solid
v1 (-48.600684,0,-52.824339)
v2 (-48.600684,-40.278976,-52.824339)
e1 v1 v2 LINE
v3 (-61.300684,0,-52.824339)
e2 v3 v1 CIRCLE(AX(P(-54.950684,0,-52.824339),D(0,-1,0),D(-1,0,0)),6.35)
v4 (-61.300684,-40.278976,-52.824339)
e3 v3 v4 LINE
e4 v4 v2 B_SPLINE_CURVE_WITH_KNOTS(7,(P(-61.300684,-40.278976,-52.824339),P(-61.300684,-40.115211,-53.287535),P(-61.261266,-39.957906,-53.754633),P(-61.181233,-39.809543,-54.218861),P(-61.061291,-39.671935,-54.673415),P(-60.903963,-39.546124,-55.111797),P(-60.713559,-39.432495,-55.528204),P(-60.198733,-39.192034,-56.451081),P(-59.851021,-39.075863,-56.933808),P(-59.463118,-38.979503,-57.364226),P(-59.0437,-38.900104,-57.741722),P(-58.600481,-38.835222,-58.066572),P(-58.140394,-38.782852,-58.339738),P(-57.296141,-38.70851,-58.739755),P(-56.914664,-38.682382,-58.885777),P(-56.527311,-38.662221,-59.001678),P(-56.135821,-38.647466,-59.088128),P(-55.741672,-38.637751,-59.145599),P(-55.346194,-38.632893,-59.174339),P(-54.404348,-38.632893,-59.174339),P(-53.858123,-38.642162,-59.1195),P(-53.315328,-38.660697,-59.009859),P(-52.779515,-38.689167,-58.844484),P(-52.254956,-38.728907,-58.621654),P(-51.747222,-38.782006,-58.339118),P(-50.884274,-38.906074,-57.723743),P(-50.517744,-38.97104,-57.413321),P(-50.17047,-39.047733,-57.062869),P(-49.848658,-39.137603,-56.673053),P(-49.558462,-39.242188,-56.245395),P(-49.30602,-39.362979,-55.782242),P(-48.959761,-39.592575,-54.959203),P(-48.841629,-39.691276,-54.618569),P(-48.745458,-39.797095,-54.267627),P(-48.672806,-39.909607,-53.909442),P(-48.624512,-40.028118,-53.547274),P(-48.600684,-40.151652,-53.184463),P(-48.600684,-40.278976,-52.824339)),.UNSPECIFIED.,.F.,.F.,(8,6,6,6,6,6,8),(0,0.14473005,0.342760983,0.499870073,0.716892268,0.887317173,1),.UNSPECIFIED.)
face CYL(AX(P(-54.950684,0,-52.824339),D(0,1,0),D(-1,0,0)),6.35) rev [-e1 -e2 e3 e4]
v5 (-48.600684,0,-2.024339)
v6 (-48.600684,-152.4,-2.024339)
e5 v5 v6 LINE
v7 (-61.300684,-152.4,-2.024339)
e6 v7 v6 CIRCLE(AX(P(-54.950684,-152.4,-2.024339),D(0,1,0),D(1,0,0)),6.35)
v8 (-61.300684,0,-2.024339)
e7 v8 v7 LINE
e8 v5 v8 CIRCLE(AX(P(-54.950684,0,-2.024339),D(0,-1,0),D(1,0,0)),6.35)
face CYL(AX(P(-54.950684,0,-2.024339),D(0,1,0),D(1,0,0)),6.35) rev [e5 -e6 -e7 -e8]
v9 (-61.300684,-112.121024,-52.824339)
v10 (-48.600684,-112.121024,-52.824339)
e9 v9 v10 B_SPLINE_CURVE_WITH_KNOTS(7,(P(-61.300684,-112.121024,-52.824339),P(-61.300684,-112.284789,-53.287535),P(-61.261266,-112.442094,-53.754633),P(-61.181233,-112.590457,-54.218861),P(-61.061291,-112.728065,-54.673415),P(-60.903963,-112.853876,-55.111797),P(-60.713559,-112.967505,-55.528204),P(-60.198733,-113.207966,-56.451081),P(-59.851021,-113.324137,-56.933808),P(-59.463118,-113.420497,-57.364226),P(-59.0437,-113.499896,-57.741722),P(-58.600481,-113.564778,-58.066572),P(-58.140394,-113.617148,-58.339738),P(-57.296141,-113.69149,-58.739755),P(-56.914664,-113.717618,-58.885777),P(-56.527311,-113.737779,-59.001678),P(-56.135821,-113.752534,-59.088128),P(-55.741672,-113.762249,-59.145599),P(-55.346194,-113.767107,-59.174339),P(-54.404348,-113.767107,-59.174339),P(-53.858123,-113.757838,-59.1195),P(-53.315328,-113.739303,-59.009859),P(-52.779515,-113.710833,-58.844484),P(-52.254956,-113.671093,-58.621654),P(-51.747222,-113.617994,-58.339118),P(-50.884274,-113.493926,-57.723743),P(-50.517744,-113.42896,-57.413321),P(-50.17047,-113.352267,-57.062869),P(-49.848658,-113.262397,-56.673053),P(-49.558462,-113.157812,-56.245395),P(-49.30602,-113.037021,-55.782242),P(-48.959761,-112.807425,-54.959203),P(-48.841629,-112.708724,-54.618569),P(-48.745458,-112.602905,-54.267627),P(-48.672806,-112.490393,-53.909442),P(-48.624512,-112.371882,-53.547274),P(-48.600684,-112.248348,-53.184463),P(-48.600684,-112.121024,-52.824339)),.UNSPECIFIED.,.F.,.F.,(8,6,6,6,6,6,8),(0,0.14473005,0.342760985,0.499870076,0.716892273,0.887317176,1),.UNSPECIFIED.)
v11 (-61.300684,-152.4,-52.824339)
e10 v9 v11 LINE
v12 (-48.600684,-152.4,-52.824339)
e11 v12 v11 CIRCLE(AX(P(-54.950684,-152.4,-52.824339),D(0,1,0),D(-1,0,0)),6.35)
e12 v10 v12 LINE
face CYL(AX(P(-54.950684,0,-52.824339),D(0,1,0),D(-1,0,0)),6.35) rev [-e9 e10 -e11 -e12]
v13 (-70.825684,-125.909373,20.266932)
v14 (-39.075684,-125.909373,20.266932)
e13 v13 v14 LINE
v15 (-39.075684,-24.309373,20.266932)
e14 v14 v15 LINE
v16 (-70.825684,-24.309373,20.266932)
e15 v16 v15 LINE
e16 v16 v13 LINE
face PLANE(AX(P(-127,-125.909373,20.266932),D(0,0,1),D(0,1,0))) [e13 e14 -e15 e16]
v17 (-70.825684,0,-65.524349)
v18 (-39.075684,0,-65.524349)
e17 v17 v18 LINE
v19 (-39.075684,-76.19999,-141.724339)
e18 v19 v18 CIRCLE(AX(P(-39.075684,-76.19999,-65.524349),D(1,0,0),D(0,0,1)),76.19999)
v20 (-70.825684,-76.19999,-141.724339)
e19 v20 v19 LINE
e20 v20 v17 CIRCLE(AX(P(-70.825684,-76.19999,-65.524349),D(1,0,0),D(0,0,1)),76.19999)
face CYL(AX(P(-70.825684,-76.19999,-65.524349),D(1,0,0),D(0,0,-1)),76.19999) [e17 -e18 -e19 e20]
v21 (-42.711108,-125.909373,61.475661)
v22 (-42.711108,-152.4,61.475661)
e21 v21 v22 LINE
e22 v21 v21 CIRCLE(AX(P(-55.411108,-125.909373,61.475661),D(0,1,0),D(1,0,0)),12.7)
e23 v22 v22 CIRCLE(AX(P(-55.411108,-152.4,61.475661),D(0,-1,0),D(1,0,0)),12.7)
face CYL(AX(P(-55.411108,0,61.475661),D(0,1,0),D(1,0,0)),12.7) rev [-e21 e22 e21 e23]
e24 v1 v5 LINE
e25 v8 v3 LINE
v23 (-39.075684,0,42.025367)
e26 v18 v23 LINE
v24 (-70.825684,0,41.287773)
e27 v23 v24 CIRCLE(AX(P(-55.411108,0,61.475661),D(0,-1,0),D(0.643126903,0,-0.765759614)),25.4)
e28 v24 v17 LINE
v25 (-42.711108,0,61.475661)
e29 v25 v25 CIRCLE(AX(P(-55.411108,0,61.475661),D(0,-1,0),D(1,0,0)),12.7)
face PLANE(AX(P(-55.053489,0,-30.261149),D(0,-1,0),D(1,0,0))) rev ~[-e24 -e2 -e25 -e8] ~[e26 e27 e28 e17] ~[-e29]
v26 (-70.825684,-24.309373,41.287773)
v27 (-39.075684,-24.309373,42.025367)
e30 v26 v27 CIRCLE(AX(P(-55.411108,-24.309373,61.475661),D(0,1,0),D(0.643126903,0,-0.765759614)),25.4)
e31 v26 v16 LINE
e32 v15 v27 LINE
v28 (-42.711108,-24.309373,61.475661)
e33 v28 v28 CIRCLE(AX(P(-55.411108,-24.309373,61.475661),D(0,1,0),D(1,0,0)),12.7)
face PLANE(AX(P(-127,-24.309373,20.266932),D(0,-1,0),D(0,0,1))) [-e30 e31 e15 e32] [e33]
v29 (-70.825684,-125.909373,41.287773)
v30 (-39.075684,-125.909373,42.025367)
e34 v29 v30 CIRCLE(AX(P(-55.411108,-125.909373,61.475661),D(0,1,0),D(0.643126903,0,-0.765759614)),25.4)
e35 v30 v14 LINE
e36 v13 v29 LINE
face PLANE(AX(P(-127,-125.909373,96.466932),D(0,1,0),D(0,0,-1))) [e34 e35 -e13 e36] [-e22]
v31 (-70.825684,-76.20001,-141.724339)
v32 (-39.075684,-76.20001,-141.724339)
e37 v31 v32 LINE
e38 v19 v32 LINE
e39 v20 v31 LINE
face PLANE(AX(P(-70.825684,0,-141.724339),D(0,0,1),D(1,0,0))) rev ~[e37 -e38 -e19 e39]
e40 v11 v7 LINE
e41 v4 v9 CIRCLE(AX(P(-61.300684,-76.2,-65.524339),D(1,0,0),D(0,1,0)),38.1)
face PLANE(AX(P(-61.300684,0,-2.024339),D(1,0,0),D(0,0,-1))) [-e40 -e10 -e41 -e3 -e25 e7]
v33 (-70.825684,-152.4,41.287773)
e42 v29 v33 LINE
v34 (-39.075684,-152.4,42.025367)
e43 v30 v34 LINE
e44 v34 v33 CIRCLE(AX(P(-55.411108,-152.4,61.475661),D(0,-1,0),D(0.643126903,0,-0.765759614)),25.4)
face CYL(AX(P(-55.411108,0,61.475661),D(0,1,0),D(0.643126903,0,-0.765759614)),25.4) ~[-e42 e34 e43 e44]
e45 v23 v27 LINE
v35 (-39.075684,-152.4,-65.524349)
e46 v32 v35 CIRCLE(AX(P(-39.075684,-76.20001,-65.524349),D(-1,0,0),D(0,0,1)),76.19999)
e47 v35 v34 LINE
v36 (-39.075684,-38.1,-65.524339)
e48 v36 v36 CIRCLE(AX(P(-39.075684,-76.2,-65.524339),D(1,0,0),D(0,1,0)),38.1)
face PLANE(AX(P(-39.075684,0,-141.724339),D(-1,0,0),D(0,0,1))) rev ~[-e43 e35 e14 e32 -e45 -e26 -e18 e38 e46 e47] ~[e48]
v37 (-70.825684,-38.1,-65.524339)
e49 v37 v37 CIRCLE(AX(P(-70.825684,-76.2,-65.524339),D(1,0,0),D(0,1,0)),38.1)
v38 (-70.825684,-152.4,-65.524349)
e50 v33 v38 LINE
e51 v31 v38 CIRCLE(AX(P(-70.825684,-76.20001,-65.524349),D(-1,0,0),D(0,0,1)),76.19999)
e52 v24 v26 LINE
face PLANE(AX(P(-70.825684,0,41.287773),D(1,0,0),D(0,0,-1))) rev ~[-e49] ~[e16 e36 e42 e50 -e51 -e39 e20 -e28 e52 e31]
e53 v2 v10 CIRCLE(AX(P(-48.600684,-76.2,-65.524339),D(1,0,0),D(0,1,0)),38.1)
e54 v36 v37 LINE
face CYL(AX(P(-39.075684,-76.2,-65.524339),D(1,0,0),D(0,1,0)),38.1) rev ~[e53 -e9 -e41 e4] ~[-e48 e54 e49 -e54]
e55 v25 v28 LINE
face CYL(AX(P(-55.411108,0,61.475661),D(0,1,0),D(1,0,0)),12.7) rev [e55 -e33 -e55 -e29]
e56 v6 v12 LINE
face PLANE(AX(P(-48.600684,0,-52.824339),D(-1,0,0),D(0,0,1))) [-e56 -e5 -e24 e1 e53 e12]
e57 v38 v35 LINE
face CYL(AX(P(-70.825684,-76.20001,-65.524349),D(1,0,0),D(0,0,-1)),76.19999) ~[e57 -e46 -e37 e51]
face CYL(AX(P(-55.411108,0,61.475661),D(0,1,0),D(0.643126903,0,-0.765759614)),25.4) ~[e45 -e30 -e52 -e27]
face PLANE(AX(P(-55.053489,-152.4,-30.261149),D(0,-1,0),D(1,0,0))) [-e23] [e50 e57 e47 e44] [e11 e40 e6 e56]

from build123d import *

# Parameters (mm, degrees)
F0_R     = 12.7
F1_DEPTH = 152.4
F2_R     = 76.19999
F3_R     = 38.1
F4_DEPTH = 41.7364233324
F7_DEPTH = 96.9898923586
F8_DEPTH = 152.401


# Not quite as in the source:
# - a fillet or chamfer is up to 0.001 mm smaller than in the source, because OpenCascade refuses the exact size


with BuildPart() as f1:
    # F0 (on Front) → F1 (new body)
    with BuildSketch(Plane.XZ):
        with BuildLine():
            Line((-39.075684309, -141.72433921), (-39.075684309, 42.0253665879))
            ThreePointArc((-39.075684309, 42.0253665879), (-56.0010235987, 86.8688094558), (-70.825684309, 41.2877726846))
            Line((-70.825684309, 41.2877726846), (-70.825684309, -141.72433921))
            Line((-70.825684309, -141.72433921), (-39.075684309, -141.72433921))
        make_face()
        with Locations((-55.4111076414, 61.47566079)):
            Circle(F0_R, mode=Mode.SUBTRACT)
        with BuildLine():
            Line((-61.300684309, -52.82433921), (-61.300684309, -2.02433921))
            ThreePointArc((-61.300684309, -2.02433921), (-54.950684309, 4.32566079), (-48.600684309, -2.02433921))
            Line((-48.600684309, -2.02433921), (-48.600684309, -52.82433921))
            ThreePointArc((-48.600684309, -52.82433921), (-54.950684309, -59.17433921), (-61.300684309, -52.82433921))
        make_face(mode=Mode.SUBTRACT)
        with BuildLine():
            ThreePointArc((-48.600684309, -2.02433921), (-54.950684309, 4.32566079), (-61.300684309, -2.02433921))
            Line((-61.300684309, -2.02433921), (-61.300684309, -52.82433921))
            ThreePointArc((-61.300684309, -52.82433921), (-54.950684309, -59.17433921), (-48.600684309, -52.82433921))
            Line((-48.600684309, -52.82433921), (-48.600684309, -2.02433921))
        make_face()
    extrude(amount=F1_DEPTH)

    # F2 (radius 76.2 in the source; OpenCascade refuses exactly that, so slightly less here)
    f2_edges = [f1.edges().sort_by_distance(p)[0] for p in [
        (-54.950684, 0, -141.724339),
        (-54.950684, -152.4, -141.724339),
    ]]
    fillet(f2_edges, radius=F2_R)

    # F3 (on face) → F4 (cut, through all)
    with BuildSketch(Plane.YZ.offset(-39.075684309)):
        with Locations((-76.2, -65.52433921)):
            Circle(F3_R)
    extrude(amount=-F4_DEPTH, mode=Mode.SUBTRACT)

    # F6 (on offset) → F7 (cut, through all)
    with BuildSketch(Plane.YZ.offset(-127)):
        Polygon((-24.3093731642, 100.3912016645), (-125.9093731642, 96.466931504), (-125.9093731642, 20.266931504), (-24.3093731642, 20.266931504), align=None)
    extrude(amount=F7_DEPTH, mode=Mode.SUBTRACT)

    # F0 (on Front) → F8 (cut, through all)
    with BuildSketch(Plane.XZ):
        with BuildLine():
            ThreePointArc((-48.600684309, -2.02433921), (-54.950684309, 4.32566079), (-61.300684309, -2.02433921))
            Line((-61.300684309, -2.02433921), (-61.300684309, -52.82433921))
            ThreePointArc((-61.300684309, -52.82433921), (-54.950684309, -59.17433921), (-48.600684309, -52.82433921))
            Line((-48.600684309, -52.82433921), (-48.600684309, -2.02433921))
        make_face()
    extrude(amount=F8_DEPTH, mode=Mode.SUBTRACT)


solid = f1.part
